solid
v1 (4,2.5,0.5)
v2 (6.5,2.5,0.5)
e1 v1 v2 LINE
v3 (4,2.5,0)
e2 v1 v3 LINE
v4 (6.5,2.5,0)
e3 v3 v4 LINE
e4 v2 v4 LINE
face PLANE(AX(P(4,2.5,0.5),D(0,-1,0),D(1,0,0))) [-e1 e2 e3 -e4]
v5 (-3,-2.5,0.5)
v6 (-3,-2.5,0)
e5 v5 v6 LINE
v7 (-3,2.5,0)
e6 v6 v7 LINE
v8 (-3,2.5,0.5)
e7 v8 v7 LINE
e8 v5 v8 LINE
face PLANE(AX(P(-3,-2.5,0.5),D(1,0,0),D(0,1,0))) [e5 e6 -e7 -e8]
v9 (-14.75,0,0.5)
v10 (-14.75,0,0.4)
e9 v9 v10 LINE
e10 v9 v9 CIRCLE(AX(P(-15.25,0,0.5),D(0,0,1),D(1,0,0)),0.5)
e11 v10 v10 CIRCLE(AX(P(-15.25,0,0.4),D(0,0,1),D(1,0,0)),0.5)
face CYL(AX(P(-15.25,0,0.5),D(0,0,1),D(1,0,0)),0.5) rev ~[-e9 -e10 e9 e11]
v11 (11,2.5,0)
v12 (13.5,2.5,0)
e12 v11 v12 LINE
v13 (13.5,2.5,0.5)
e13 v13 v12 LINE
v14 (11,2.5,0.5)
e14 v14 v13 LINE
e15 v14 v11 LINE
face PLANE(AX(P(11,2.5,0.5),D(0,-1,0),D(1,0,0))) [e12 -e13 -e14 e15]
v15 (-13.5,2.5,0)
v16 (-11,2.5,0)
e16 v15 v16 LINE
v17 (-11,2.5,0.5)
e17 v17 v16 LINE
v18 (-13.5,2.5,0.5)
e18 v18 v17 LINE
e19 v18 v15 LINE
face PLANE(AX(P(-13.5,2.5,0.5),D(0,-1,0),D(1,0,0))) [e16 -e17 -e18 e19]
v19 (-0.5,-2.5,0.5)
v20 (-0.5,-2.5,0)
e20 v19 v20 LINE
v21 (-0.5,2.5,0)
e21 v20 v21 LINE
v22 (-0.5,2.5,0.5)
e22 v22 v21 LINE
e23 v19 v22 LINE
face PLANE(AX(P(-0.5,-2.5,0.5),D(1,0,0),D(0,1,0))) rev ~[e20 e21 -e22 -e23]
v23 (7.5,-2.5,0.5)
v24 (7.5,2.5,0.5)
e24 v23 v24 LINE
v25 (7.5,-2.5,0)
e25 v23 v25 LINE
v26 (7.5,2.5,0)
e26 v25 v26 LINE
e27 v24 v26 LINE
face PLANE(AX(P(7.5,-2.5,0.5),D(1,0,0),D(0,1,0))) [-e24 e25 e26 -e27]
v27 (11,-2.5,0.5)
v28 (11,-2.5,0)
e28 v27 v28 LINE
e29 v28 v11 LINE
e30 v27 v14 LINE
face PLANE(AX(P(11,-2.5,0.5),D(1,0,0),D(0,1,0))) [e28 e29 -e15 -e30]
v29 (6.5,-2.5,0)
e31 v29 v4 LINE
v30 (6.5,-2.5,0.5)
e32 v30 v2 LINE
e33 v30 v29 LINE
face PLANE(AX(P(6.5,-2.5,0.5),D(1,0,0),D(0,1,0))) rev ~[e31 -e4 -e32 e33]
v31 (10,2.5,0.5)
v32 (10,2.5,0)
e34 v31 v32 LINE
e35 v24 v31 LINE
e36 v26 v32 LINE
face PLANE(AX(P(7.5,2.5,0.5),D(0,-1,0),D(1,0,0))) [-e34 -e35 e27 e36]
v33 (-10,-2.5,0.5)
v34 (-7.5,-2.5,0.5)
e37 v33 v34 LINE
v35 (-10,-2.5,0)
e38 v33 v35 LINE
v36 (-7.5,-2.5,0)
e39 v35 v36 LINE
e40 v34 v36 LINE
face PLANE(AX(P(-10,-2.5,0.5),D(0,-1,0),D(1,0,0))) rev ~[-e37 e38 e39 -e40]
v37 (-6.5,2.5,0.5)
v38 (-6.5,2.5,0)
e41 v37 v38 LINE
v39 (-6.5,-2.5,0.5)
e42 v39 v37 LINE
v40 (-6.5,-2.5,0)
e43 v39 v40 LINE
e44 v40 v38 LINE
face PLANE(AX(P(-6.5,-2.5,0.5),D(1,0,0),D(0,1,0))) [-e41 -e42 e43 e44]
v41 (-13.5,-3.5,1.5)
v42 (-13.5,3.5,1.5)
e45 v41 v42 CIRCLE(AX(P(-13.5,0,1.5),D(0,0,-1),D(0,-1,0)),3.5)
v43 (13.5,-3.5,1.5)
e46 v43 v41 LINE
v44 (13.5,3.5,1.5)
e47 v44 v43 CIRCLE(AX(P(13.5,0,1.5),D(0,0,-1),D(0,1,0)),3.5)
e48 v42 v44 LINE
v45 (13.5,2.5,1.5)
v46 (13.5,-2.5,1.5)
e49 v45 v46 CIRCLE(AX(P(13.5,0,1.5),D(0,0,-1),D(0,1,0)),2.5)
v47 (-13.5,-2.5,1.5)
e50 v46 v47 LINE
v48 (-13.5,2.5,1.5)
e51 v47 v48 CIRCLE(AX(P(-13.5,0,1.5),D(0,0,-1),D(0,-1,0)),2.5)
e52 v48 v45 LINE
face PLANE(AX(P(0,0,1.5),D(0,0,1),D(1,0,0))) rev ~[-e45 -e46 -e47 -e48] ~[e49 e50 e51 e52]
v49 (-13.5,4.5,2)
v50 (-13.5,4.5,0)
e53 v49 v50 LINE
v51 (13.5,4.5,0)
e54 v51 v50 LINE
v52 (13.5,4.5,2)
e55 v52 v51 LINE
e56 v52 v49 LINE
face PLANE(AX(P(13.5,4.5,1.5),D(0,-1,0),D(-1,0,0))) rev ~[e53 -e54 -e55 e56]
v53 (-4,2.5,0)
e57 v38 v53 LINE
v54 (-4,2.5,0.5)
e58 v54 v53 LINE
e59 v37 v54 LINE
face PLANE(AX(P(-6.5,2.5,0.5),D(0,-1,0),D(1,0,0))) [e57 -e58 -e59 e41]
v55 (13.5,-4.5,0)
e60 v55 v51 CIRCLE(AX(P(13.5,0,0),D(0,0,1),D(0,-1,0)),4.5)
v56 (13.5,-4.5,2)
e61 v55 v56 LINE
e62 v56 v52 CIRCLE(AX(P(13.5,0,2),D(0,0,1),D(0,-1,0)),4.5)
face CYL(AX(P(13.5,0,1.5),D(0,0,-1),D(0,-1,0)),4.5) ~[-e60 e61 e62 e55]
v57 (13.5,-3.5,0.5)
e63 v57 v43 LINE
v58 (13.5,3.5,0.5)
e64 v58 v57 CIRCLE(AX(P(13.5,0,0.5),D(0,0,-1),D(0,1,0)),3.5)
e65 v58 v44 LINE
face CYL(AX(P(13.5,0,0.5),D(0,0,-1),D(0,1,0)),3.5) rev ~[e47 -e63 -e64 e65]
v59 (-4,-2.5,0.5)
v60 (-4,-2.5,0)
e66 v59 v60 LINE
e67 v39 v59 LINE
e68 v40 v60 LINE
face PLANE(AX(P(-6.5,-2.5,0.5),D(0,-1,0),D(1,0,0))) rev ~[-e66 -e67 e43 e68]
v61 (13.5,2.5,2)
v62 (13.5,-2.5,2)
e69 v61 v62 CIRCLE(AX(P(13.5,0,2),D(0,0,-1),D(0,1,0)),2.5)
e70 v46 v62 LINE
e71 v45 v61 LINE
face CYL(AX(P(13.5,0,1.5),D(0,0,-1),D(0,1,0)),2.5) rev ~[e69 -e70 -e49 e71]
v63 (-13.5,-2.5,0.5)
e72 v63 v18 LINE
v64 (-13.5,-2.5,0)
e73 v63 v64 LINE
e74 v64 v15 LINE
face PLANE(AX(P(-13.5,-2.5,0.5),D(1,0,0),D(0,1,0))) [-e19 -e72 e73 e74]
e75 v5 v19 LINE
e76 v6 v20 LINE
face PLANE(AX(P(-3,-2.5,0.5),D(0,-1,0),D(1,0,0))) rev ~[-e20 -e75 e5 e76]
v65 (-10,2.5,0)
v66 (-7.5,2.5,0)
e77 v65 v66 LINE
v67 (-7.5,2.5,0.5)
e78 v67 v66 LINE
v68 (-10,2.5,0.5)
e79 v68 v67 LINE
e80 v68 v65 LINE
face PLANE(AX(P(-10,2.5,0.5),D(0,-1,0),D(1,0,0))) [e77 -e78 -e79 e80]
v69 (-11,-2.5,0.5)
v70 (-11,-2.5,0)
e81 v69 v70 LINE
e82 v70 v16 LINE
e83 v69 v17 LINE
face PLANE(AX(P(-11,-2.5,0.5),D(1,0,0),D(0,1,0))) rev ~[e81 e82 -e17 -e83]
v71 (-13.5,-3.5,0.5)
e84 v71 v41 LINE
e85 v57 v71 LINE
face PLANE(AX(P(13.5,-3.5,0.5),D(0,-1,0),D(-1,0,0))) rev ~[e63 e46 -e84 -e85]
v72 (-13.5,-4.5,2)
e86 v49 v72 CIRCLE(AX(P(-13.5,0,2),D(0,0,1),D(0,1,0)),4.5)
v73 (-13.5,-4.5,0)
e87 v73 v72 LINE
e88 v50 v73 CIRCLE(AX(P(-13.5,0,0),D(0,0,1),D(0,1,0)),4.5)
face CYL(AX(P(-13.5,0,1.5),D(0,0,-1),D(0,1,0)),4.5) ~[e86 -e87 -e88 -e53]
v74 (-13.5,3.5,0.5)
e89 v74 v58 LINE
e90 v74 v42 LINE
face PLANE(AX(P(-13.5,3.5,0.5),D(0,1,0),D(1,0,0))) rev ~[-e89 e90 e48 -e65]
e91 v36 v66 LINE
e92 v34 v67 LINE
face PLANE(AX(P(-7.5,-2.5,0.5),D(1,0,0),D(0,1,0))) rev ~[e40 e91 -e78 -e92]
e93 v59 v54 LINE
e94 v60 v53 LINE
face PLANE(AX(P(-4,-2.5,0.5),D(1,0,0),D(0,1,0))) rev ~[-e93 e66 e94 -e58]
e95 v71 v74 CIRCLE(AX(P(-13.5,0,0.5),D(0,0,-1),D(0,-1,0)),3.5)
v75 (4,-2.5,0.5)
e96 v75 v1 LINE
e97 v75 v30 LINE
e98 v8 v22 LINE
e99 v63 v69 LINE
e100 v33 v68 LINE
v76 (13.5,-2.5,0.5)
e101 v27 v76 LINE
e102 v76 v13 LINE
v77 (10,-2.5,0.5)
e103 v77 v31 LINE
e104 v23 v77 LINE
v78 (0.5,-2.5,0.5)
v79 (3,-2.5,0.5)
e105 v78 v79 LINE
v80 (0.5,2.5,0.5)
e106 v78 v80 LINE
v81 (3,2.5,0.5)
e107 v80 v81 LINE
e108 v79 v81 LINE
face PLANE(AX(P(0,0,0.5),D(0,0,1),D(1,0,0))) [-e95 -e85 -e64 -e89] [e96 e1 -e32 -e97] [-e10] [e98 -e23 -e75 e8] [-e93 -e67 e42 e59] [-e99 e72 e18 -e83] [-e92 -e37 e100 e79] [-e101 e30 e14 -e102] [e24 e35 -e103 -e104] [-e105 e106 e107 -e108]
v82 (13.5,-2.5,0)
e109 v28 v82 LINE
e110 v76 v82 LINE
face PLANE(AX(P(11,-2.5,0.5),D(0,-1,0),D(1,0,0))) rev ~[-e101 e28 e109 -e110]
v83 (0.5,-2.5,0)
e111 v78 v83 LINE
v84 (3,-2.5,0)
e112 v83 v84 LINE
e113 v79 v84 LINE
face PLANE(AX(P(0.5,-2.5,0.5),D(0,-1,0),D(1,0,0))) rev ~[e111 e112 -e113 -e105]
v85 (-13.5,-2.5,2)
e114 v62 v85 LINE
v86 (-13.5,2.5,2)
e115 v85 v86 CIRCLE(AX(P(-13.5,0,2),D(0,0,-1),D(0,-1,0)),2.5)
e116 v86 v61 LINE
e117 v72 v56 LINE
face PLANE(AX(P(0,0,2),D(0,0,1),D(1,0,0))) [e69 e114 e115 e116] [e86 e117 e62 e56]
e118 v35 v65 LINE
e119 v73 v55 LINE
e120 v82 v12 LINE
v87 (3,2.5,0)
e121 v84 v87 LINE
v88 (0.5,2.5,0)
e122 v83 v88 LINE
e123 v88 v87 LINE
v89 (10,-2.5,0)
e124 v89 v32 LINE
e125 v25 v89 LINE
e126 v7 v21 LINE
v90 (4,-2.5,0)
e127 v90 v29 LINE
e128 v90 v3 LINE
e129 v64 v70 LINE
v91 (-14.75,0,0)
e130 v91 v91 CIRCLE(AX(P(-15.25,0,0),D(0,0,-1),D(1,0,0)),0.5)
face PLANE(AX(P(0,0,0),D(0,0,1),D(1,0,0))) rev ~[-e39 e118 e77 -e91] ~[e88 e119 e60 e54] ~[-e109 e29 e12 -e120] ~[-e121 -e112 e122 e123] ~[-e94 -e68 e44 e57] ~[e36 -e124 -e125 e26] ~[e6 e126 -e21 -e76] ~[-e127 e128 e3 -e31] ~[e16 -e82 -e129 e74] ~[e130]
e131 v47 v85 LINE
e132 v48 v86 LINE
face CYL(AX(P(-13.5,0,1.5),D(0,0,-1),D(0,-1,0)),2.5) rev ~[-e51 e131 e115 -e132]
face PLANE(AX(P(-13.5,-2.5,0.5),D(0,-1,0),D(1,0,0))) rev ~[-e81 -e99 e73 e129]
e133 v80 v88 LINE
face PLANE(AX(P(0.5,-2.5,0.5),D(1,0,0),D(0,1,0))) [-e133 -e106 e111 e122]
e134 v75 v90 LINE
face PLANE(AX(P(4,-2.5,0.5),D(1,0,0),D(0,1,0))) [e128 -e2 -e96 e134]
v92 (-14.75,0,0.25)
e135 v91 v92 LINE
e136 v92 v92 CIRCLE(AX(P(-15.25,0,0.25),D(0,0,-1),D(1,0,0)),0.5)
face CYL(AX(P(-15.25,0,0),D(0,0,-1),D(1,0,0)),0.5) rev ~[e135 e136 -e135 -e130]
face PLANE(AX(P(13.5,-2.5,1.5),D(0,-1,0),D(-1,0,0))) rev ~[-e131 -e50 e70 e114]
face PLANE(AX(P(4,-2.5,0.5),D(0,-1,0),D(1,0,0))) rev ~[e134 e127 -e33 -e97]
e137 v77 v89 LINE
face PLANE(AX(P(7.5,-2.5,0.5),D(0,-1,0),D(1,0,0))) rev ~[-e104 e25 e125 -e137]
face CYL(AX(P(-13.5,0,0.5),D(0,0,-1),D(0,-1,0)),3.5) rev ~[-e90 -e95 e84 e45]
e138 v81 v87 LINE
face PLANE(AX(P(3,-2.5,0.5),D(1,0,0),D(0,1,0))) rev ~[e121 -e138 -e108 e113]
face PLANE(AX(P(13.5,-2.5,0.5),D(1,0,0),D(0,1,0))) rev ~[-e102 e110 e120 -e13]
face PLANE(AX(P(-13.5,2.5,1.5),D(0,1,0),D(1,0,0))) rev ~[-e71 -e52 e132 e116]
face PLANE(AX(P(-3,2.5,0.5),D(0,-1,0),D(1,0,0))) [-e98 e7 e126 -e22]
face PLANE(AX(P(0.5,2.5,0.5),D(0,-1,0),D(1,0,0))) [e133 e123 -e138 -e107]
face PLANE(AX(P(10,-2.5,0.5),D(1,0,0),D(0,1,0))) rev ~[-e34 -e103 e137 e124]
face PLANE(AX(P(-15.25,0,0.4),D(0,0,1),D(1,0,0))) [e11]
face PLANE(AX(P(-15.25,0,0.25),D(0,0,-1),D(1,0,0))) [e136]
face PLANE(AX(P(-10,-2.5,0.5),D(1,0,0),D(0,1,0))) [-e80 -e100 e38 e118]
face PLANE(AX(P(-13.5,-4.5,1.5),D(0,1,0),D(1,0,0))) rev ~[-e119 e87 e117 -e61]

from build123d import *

# Parameters (mm, degrees)
F1_DEPTH  = 0.5
F2_W      = 2.5
F2_H      = 5
F3_DEPTH  = 0.501
F4_DEPTH  = 1
F6_DEPTH  = 0.5
F8_DEPTH  = 0.1
F10_DEPTH = 0.25


# Not quite as in the source:
# - a feature names something its author has since deleted; it is built from what else it names


with BuildPart() as f1:
    # F0 (on Top) → F1 (new body)
    with BuildSketch(Plane.XY):
        with BuildLine():
            Line((0, 4.5), (-13.5, 4.5))
            ThreePointArc((-13.5, 4.5), (-18, 0), (-13.5, -4.5))
            Line((-13.5, -4.5), (0, -4.5))
            Line((0, -4.5), (13.5, -4.5))
            ThreePointArc((13.5, -4.5), (18, 0), (13.5, 4.5))
            Line((13.5, 4.5), (0, 4.5))
        make_face()
    extrude(amount=F1_DEPTH)

    # F2 (on face) → F3 (cut, through all)
    with BuildSketch(Plane.XY.offset(0.5)):
        with Locations((-12.25, 0)):
            Rectangle(F2_W, F2_H)
        with Locations((-5.25, 0)):
            Rectangle(F2_W, F2_H)
        with Locations((-1.75, 0)):
            Rectangle(F2_W, F2_H)
        with Locations((-8.75, 0)):
            Rectangle(F2_W, F2_H)
        with Locations((1.75, 0)):
            Rectangle(F2_W, F2_H)
        with Locations((5.25, 0)):
            Rectangle(F2_W, F2_H)
        with Locations((8.75, 0)):
            Rectangle(F2_W, F2_H)
        with Locations((12.25, 0)):
            Rectangle(F2_W, F2_H)
    extrude(amount=-F3_DEPTH, mode=Mode.SUBTRACT)

    # F2 (on face) → F4 (join)
    with BuildSketch(Plane.XY.offset(0.5)):
        with BuildLine():
            Line((0, 4.5), (-13.5, 4.5))
            ThreePointArc((-13.5, 4.5), (-18, 0), (-13.5, -4.5))
            Line((-13.5, -4.5), (0, -4.5))
            Line((0, -4.5), (13.5, -4.5))
            ThreePointArc((13.5, -4.5), (18, 0), (13.5, 4.5))
            Line((13.5, 4.5), (0, 4.5))
        make_face()
        with BuildLine():
            ThreePointArc((-13.5, -3.5), (-17, 0), (-13.5, 3.5))
            Line((-13.5, 3.5), (0, 3.5))
            Line((0, 3.5), (13.5, 3.5))
            ThreePointArc((13.5, 3.5), (17, 0), (13.5, -3.5))
            Line((13.5, -3.5), (0, -3.5))
            Line((0, -3.5), (-13.5, -3.5))
        make_face(mode=Mode.SUBTRACT)
    extrude(amount=F4_DEPTH)

    # F5 (on face) → F6 (join)
    with BuildSketch(Plane.XY.offset(1.5)):
        with BuildLine():
            Line((0, 4.5), (-13.5, 4.5))
            ThreePointArc((-13.5, 4.5), (-18, 0), (-13.5, -4.5))
            Line((-13.5, -4.5), (0, -4.5))
            Line((0, -4.5), (13.5, -4.5))
            ThreePointArc((13.5, -4.5), (18, 0), (13.5, 4.5))
            Line((13.5, 4.5), (0, 4.5))
        make_face()
        with BuildLine():
            Line((13.5, -3.5), (-13.5, -3.5))
            ThreePointArc((-13.5, -3.5), (-17, 0), (-13.5, 3.5))
            Line((-13.5, 3.5), (13.5, 3.5))
            ThreePointArc((13.5, 3.5), (17, 0), (13.5, -3.5))
        make_face(mode=Mode.SUBTRACT)
        with BuildLine():
            ThreePointArc((-13.5, 3.5), (-17, 0), (-13.5, -3.5))
            Line((-13.5, -3.5), (13.5, -3.5))
            ThreePointArc((13.5, -3.5), (17, 0), (13.5, 3.5))
            Line((13.5, 3.5), (-13.5, 3.5))
        make_face()
        with BuildLine():
            ThreePointArc((-13.5, -2.5), (-16, 0), (-13.5, 2.5))
            Line((-13.5, 2.5), (0, 2.5))
            Line((0, 2.5), (13.5, 2.5))
            ThreePointArc((13.5, 2.5), (16, 0), (13.5, -2.5))
            Line((13.5, -2.5), (0, -2.5))
            Line((0, -2.5), (-13.5, -2.5))
        make_face(mode=Mode.SUBTRACT)
    extrude(amount=F6_DEPTH)

    # F7 (on face) → F8 (cut)
    with BuildSketch(Plane.XY.offset(0.5)):
        with BuildLine():
            ThreePointArc((-15.75, 0), (-15.25, -0.5), (-14.75, 0))
            ThreePointArc((-14.75, 0), (-15.25, 0.5), (-15.75, 0))
        make_face()
    extrude(amount=-F8_DEPTH, mode=Mode.SUBTRACT)

    # F9 (on face) → F10 (cut)
    with BuildSketch(Plane(origin=(0, 0, 0), x_dir=(1, 0, 0), z_dir=(0, 0, -1))):
        with BuildLine():
            ThreePointArc((-15.75, 0), (-15.25, -0.5), (-14.75, 0))
            ThreePointArc((-14.75, 0), (-15.25, 0.5), (-15.75, 0))
        make_face()
    extrude(amount=-F10_DEPTH, mode=Mode.SUBTRACT)


solid = f1.part
